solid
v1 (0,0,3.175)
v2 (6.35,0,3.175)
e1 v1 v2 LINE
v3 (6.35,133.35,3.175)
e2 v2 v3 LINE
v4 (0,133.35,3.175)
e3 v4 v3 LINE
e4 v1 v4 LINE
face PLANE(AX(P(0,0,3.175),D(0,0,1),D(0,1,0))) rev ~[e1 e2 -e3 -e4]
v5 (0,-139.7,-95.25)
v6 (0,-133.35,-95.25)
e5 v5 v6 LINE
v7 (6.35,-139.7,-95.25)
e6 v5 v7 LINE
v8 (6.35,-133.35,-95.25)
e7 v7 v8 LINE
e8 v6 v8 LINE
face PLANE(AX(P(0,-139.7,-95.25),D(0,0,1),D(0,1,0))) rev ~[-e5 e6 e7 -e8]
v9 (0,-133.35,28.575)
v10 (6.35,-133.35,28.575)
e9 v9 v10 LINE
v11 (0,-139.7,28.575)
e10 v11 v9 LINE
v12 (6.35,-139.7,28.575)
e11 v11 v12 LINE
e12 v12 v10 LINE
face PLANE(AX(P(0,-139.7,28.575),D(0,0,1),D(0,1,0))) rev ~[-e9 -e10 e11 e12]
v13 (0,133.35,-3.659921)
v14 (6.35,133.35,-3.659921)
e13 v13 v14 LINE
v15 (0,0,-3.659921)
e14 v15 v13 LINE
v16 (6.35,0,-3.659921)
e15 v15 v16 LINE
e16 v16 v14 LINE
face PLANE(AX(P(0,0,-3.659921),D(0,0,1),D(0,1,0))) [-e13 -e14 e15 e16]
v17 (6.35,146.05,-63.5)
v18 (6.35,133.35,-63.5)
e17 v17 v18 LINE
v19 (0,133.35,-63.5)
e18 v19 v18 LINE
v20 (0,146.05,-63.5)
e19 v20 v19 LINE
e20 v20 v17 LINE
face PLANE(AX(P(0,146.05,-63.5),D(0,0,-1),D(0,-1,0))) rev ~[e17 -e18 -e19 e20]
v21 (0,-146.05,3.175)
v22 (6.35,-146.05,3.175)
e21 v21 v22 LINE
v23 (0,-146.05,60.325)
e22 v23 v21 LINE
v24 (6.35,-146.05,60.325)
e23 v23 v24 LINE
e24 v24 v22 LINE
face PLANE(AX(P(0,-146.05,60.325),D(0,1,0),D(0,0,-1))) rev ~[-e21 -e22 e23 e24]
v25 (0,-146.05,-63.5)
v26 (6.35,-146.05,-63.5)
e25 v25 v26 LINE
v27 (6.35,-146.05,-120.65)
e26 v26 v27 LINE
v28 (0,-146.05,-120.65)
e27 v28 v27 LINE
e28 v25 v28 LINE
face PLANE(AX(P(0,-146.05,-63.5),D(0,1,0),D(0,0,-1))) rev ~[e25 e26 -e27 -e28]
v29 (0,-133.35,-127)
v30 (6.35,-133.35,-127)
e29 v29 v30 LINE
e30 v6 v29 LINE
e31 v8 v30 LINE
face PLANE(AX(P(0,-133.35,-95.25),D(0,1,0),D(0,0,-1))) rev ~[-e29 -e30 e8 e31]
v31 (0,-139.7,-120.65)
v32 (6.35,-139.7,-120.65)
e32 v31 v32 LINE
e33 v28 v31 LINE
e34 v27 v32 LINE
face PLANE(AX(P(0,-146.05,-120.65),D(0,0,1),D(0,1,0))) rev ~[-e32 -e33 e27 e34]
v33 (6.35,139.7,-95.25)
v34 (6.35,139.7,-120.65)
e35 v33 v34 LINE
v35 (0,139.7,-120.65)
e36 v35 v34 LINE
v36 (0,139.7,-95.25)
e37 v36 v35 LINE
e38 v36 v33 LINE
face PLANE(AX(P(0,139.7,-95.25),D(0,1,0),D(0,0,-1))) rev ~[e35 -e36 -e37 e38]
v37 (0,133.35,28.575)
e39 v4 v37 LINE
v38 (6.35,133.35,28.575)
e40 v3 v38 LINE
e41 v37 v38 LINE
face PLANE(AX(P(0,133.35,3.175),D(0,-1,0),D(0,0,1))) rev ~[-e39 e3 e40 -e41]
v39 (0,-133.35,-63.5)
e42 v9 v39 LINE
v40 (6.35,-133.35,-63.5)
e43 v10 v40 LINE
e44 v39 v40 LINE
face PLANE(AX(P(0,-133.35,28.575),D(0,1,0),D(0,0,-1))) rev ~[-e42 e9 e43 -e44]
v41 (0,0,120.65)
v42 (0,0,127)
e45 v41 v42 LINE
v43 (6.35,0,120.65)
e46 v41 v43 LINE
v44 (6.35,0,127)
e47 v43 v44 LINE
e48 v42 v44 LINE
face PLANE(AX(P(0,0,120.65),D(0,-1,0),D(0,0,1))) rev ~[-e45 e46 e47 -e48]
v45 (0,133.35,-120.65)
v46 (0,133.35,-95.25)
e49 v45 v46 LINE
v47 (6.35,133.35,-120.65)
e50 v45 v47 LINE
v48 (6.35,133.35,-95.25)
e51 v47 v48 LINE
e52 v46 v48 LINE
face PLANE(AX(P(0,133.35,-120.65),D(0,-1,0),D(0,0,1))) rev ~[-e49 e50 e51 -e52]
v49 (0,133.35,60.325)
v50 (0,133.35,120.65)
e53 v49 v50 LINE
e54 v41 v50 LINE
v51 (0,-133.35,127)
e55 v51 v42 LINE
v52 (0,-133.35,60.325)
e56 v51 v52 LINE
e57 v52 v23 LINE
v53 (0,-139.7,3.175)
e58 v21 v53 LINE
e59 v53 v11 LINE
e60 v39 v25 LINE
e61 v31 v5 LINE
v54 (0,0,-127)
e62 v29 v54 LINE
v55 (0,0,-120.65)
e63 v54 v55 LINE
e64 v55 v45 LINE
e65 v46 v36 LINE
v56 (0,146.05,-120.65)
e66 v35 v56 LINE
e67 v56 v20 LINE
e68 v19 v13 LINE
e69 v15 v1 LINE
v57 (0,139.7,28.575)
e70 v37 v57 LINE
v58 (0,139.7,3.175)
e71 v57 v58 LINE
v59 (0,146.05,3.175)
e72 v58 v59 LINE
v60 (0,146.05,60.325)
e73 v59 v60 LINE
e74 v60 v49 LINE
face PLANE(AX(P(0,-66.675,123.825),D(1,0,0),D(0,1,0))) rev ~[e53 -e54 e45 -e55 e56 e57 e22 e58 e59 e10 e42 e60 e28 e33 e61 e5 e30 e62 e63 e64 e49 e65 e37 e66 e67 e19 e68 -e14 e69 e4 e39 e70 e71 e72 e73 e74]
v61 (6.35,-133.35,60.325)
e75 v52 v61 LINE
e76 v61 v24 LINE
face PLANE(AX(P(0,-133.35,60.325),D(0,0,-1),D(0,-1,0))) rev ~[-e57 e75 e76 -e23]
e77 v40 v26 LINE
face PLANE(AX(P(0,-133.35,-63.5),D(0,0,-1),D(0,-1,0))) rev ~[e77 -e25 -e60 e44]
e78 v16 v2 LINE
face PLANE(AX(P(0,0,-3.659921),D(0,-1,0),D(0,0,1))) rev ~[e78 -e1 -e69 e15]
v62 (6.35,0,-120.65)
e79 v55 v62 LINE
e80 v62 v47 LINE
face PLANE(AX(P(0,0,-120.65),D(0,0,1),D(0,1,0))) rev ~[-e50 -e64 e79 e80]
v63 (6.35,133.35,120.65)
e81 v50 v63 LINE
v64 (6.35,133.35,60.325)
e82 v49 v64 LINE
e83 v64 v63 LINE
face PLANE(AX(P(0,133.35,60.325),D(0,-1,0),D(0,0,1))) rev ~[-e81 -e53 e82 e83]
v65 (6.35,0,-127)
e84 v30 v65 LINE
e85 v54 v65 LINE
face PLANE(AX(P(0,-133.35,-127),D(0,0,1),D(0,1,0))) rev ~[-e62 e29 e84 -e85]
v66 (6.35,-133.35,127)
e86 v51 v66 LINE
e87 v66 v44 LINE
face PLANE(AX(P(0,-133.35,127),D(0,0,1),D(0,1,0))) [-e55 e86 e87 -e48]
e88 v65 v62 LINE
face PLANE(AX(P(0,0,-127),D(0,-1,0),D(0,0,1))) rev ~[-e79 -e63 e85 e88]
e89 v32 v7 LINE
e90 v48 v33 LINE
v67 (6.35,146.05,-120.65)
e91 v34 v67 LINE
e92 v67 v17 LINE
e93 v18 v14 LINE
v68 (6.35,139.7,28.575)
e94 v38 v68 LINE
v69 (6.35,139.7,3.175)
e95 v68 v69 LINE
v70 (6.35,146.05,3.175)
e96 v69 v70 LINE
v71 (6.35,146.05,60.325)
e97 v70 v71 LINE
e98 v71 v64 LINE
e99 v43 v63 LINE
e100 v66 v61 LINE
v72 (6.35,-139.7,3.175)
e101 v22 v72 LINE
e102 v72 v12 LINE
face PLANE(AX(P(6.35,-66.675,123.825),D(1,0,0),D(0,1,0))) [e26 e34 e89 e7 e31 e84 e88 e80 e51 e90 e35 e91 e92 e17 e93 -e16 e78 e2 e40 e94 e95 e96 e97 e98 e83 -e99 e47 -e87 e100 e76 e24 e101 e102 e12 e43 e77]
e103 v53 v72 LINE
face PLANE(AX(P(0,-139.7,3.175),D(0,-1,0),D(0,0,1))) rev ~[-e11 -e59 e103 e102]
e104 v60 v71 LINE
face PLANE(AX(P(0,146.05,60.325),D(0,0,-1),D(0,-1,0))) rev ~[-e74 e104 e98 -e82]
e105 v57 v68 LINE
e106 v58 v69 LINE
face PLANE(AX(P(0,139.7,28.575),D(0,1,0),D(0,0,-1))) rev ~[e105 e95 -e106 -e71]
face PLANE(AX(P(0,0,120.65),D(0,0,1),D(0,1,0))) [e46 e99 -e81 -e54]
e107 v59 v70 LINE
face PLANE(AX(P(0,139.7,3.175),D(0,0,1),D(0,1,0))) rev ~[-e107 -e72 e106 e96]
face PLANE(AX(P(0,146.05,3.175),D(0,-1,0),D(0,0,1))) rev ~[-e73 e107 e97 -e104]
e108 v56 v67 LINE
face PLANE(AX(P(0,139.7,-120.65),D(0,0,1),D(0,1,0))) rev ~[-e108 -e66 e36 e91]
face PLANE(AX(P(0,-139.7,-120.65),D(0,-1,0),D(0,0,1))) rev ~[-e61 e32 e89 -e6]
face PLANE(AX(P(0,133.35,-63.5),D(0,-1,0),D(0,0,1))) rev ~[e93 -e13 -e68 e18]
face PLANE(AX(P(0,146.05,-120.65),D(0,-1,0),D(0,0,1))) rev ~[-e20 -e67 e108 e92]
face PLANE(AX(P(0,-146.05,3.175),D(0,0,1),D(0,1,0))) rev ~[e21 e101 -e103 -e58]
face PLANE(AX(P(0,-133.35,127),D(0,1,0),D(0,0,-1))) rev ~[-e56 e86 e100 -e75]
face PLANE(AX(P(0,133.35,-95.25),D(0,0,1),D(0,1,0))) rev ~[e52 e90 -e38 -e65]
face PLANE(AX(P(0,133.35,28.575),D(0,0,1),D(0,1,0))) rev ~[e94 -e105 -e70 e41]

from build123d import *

# Parameters (mm, degrees)
F0_W     = 133.35
F0_H     = 6.35
F0_H_2   = 60.325
F0_H_3   = 31.75
F0_W_2   = 6.35
F0_H_4   = 25.4
F0_H_5   = 6.8349212326
F0_H_6   = 59.8400787674
F1_DEPTH = 6.35


# Not quite as in the source:
# - a feature names something its author has since deleted; it is built from what else it names


with BuildPart() as f1:
    # F0 (on Right) → F1 (new body)
    with BuildSketch(Plane.YZ):
        with Locations((-66.675, 123.825)):
            Rectangle(F0_W, F0_H)
        with Locations((-66.675, 90.4875)):
            Rectangle(F0_W, F0_H_2)
        with Locations((66.675, 90.4875)):
            Rectangle(F0_W, F0_H_2)
        with Locations((-66.675, 44.45)):
            Rectangle(F0_W, F0_H_3)
        with Locations((-136.525, 44.45)):
            Rectangle(F0_W_2, F0_H_3)
        with Locations((66.675, 44.45)):
            Rectangle(F0_W, F0_H_3)
        with Locations((-66.675, 15.875)):
            Rectangle(F0_W, F0_H_4)
        with Locations((-142.875, 44.45)):
            Rectangle(F0_W_2, F0_H_3)
        with Locations((136.525, 44.45)):
            Rectangle(F0_W_2, F0_H_3)
        with Locations((66.675, 15.875)):
            Rectangle(F0_W, F0_H_4)
        with Locations((-66.675, -0.2424606163)):
            Rectangle(F0_W, F0_H_5)
        with Locations((-142.875, 15.875)):
            Rectangle(F0_W_2, F0_H_4)
        Polygon((146.05, 60.325), (139.7, 60.325), (139.7, 28.575), (139.7, 3.175), (146.05, 3.175), align=None)
        with Locations((-66.675, -33.5799606163)):
            Rectangle(F0_W, F0_H_6)
        with Locations((66.675, -33.5799606163)):
            Rectangle(F0_W, F0_H_6)
        with Locations((-66.675, -79.375)):
            Rectangle(F0_W, F0_H_3)
        with Locations((-136.525, -79.375)):
            Rectangle(F0_W_2, F0_H_3)
        with Locations((66.675, -79.375)):
            Rectangle(F0_W, F0_H_3)
        with Locations((-66.675, -107.95)):
            Rectangle(F0_W, F0_H_4)
        with Locations((-142.875, -79.375)):
            Rectangle(F0_W_2, F0_H_3)
        with Locations((136.525, -79.375)):
            Rectangle(F0_W_2, F0_H_3)
        with Locations((66.675, -107.95)):
            Rectangle(F0_W, F0_H_4)
        with Locations((-66.675, -123.825)):
            Rectangle(F0_W, F0_H)
        with Locations((-142.875, -107.95)):
            Rectangle(F0_W_2, F0_H_4)
        Polygon((146.05, -63.5), (139.7, -63.5), (139.7, -95.25), (139.7, -120.65), (146.05, -120.65), align=None)
    extrude(amount=F1_DEPTH)


solid = f1.part
